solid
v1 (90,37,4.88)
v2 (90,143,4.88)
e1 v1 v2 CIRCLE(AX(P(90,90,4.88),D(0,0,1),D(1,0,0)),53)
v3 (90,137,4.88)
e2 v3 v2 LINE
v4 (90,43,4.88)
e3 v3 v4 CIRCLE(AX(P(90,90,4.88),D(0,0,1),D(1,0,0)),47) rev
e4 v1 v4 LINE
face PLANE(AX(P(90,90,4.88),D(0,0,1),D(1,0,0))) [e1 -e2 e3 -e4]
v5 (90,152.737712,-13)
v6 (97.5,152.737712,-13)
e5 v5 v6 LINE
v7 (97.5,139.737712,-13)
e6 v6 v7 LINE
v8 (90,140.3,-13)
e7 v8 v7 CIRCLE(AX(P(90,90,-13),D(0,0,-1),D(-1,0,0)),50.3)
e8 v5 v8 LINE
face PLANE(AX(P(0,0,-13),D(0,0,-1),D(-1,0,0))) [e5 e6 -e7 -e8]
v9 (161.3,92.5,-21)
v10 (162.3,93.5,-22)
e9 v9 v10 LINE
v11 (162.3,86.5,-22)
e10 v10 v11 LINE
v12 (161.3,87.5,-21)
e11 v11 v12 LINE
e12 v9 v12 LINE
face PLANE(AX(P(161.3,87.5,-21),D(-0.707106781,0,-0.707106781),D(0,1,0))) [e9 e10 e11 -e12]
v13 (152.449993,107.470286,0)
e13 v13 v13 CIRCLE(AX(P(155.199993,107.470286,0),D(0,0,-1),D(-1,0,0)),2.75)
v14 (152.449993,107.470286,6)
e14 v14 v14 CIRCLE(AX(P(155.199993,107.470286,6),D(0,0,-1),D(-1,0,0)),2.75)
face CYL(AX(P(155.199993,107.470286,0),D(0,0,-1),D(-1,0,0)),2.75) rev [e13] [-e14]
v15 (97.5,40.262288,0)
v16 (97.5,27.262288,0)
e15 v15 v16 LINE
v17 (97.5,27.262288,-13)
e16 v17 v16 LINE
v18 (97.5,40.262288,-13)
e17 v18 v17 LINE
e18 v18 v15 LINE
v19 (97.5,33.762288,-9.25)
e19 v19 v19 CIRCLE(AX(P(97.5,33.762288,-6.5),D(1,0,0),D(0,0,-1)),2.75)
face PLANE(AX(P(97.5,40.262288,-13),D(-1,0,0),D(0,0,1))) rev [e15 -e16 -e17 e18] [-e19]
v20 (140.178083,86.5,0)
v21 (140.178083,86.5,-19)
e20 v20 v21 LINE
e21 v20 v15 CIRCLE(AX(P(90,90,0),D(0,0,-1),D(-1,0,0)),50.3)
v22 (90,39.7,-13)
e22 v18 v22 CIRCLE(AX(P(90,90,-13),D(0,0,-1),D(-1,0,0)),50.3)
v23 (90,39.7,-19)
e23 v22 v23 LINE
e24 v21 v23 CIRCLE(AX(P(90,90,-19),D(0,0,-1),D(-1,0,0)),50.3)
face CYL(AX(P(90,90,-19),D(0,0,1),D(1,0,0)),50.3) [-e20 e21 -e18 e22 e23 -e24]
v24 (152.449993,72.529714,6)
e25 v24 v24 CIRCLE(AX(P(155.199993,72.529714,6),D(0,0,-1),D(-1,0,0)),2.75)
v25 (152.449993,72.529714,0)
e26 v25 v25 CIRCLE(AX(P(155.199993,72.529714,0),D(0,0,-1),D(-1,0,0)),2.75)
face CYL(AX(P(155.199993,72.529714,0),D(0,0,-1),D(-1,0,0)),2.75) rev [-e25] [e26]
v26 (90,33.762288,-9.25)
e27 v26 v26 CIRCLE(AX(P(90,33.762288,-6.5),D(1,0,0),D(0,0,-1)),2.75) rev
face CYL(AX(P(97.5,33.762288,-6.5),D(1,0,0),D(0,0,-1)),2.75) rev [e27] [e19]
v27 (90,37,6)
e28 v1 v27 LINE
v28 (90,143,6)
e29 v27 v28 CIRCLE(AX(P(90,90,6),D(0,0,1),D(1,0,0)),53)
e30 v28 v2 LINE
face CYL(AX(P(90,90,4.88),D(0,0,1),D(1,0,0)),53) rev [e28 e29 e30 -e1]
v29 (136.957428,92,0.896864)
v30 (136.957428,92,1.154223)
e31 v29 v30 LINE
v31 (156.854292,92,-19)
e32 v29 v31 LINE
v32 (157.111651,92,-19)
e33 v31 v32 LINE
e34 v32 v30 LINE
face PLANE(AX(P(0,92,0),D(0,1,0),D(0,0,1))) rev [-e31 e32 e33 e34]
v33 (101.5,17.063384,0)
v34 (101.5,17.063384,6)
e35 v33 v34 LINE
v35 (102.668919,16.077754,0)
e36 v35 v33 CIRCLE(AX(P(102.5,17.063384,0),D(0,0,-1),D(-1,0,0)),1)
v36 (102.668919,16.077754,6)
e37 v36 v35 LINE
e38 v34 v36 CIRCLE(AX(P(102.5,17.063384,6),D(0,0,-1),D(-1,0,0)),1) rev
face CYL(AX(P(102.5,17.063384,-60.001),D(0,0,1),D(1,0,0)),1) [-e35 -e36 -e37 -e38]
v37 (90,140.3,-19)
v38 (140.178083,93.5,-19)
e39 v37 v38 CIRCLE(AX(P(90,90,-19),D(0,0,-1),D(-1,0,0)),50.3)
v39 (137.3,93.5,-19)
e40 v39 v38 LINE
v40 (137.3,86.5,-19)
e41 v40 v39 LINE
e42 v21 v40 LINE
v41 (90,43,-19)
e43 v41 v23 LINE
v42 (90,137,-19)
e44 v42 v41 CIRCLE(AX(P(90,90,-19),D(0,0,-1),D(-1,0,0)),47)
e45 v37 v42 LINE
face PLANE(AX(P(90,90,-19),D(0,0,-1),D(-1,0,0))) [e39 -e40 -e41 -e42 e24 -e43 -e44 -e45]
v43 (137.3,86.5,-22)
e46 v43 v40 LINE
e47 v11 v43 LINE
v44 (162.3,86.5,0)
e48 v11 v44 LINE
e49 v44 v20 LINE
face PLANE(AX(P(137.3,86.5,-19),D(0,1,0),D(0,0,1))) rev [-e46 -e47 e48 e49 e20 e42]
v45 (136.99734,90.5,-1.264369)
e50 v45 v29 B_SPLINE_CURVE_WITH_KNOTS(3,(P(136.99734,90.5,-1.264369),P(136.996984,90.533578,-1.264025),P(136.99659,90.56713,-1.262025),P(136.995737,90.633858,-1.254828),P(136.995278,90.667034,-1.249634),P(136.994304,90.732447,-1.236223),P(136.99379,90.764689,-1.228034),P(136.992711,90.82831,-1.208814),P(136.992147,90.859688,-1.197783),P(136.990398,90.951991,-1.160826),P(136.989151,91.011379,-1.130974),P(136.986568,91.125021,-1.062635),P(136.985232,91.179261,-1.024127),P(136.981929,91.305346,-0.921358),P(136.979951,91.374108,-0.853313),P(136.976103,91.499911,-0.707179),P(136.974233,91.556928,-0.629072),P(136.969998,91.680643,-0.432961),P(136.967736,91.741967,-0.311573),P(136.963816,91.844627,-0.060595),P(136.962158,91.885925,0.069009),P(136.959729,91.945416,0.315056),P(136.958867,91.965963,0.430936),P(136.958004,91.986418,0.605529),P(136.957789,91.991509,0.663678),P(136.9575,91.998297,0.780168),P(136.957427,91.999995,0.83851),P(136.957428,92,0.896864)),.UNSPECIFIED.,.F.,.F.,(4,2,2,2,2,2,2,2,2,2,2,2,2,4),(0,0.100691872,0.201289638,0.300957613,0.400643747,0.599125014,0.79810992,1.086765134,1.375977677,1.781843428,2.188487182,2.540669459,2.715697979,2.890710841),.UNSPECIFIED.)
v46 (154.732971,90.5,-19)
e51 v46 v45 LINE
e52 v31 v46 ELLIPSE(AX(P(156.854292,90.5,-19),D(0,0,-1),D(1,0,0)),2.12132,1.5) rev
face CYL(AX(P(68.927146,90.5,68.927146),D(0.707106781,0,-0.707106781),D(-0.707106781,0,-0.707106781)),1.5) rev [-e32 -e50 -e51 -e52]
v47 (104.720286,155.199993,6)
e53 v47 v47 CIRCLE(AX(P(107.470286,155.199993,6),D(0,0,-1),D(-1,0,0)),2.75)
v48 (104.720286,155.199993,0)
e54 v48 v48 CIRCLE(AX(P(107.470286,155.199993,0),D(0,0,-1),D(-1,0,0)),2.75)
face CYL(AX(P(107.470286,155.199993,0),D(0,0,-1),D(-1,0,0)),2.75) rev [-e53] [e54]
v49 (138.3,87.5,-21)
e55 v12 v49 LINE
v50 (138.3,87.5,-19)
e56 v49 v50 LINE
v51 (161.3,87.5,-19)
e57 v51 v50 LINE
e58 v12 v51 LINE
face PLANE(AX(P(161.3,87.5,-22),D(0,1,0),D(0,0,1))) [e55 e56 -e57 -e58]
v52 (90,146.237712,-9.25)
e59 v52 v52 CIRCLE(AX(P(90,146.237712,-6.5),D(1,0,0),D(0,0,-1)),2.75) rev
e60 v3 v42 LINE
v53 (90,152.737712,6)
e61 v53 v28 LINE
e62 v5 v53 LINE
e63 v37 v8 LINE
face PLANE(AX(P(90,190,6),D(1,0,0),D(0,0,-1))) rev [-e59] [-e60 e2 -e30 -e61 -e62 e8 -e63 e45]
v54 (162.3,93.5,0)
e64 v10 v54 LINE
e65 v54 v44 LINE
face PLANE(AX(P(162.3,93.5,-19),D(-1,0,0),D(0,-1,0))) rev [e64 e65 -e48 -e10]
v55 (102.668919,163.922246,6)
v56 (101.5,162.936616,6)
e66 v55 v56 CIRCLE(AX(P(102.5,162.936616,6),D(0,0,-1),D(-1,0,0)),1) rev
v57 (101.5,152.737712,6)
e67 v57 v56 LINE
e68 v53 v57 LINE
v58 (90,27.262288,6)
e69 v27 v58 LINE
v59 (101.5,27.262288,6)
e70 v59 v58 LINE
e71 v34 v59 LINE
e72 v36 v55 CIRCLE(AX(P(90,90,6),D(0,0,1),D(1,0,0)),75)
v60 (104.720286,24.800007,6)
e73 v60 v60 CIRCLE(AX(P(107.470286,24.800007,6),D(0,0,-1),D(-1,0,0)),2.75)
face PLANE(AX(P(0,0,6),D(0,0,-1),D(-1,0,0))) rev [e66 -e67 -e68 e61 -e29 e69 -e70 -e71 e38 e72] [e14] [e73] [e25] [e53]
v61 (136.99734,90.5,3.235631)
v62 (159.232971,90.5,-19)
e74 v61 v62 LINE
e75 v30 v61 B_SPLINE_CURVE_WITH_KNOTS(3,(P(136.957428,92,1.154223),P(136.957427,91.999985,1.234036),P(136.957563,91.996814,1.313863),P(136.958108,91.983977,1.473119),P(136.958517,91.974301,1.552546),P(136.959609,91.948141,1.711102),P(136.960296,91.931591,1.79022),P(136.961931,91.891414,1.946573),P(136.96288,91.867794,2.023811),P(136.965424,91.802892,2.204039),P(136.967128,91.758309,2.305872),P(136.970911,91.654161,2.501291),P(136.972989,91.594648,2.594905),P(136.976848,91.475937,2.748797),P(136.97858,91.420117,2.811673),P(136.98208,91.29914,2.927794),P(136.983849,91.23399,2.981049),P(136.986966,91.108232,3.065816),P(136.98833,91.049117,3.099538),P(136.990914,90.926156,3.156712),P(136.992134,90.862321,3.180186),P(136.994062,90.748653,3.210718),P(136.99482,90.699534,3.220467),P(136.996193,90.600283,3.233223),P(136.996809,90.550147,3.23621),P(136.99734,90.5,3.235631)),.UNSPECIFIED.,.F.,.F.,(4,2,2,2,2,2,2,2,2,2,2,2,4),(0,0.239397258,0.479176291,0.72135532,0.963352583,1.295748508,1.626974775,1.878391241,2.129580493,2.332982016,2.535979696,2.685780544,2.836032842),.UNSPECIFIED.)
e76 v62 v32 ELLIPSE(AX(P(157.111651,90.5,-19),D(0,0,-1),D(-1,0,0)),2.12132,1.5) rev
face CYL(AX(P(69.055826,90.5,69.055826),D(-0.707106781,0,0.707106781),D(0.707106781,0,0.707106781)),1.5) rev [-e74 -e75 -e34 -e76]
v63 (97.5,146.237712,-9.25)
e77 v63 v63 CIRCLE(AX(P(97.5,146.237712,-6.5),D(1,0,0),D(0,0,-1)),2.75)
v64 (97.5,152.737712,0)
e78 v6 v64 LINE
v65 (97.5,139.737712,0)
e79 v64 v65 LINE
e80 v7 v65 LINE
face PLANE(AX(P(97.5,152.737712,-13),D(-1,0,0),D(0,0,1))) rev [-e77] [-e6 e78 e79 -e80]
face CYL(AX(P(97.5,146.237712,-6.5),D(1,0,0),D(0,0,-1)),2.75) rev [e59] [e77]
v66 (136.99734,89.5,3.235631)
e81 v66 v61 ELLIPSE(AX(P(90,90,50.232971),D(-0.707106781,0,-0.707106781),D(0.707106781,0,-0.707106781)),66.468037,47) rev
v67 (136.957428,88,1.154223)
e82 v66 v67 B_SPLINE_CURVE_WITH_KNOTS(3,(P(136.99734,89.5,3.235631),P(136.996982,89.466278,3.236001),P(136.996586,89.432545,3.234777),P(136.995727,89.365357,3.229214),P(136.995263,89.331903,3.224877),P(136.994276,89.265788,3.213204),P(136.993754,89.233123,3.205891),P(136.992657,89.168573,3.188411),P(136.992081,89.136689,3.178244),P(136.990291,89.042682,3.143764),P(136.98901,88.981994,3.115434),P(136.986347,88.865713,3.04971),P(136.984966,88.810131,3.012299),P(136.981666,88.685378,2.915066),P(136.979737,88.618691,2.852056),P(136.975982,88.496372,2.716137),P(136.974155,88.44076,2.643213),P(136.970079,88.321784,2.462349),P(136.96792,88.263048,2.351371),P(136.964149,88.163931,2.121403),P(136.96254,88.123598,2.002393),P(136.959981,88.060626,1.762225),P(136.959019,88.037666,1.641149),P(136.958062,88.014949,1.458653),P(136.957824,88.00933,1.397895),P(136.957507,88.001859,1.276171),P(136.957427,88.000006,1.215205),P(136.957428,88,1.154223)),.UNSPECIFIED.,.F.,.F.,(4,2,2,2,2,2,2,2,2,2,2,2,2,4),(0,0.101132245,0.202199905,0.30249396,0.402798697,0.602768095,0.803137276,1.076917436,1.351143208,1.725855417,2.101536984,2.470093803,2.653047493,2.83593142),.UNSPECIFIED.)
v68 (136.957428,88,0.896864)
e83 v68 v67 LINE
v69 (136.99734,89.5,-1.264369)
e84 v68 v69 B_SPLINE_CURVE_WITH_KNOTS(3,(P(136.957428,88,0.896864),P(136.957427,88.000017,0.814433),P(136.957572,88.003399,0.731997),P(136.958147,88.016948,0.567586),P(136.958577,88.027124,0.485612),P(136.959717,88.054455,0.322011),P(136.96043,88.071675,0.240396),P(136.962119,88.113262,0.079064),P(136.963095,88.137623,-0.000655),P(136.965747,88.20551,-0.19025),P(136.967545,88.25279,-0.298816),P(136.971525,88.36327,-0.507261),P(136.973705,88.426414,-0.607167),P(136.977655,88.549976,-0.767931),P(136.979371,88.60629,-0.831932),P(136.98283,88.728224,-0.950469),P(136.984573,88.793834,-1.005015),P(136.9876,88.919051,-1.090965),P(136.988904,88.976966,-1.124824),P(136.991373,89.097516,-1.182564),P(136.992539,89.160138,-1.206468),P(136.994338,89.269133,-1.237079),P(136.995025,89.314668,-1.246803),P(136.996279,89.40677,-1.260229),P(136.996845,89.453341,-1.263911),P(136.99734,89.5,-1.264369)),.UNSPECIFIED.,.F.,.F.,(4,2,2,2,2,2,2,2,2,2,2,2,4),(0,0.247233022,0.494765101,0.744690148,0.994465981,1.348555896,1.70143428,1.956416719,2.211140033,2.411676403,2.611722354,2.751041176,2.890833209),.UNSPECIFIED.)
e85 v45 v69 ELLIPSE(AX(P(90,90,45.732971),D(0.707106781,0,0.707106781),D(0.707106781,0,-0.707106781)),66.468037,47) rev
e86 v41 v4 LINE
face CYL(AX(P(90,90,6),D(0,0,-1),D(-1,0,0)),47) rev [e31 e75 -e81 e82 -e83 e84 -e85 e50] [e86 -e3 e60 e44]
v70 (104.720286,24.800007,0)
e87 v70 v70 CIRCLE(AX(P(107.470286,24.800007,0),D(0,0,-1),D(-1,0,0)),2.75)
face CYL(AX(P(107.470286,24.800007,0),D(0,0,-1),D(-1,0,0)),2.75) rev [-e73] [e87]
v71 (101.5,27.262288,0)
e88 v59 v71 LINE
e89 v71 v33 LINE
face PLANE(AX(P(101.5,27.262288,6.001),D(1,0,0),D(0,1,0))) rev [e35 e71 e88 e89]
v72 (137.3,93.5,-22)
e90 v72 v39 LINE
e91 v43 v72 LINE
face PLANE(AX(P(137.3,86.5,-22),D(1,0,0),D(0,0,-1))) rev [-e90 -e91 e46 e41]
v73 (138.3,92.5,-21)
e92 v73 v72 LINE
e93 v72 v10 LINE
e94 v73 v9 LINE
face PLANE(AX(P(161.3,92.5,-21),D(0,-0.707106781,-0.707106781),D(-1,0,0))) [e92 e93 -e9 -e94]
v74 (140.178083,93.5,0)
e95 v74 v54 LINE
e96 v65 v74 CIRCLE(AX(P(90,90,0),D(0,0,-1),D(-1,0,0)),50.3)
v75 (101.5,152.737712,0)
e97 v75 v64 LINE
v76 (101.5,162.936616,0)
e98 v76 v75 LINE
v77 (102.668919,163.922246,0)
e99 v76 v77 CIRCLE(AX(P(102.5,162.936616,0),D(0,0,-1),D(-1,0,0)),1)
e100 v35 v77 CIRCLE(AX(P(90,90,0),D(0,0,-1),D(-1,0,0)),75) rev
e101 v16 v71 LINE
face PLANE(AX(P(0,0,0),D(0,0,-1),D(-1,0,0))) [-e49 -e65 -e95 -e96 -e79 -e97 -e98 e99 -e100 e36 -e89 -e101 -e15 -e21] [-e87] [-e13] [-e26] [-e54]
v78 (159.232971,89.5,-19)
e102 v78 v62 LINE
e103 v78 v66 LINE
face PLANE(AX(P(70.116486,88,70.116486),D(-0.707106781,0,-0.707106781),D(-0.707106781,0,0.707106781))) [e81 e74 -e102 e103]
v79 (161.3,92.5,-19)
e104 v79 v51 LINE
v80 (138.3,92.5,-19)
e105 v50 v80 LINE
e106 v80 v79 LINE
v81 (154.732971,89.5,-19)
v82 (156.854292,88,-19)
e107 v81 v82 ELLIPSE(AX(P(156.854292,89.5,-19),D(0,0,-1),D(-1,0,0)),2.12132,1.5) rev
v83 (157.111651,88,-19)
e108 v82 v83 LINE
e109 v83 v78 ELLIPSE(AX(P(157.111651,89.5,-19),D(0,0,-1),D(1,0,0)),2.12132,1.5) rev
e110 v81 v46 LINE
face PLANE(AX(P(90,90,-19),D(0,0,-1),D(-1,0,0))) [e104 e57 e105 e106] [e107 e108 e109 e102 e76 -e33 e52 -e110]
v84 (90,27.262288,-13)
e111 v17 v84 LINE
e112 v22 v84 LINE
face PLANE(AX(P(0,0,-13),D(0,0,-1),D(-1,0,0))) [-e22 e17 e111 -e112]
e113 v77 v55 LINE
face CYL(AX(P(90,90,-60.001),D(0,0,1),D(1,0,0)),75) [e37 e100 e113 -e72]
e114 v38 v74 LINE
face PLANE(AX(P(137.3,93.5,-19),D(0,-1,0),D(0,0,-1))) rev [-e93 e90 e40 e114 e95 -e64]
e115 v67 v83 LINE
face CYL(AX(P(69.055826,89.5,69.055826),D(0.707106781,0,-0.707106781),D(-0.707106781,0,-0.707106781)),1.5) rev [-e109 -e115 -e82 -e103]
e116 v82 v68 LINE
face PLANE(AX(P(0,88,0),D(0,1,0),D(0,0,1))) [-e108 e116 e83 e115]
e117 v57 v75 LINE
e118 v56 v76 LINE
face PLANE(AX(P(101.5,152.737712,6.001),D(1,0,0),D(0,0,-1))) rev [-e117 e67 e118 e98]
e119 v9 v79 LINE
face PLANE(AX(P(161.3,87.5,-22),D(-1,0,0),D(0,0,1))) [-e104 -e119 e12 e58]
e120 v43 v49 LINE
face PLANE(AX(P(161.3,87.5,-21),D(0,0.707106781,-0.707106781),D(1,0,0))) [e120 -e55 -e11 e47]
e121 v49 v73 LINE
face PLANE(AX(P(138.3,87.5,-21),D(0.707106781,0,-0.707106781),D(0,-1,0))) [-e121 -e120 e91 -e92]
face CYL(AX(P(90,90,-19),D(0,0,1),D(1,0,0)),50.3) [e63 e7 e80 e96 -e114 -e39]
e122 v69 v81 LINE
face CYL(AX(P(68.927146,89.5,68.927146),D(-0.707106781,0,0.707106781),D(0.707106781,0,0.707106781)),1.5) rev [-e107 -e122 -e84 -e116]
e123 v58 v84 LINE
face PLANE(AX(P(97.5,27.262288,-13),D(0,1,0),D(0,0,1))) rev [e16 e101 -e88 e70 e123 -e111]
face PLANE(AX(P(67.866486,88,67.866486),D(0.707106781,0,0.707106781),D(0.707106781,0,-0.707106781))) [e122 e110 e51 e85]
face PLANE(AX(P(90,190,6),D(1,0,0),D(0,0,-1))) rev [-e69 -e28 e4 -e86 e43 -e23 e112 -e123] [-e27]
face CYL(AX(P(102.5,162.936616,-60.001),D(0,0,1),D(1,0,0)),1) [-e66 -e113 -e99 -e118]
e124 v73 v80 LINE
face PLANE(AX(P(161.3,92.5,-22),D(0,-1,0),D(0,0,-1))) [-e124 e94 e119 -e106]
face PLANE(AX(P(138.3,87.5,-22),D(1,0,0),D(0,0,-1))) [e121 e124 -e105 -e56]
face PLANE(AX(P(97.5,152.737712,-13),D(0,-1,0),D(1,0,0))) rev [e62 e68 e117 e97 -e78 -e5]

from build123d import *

# Parameters (mm, degrees)
SKETCH1_W                = 180
SKETCH1_H                = 180
BOSS_EXTRUDE1_DEPTH      = 6
SKETCH2_R                = 50.3
SKETCH2_R_2              = 46.3
BOSS_EXTRUDE2_DEPTH      = 19
CUT_EXTRUDE1_DEPTH       = 256.266527379
CUT_EXTRUDE1_DEPTH_BACK  = 256.266527379
SKETCH3_R                = 47
BOSS_EXTRUDE3_DEPTH      = 60
FILLET4_R                = 3
M5_CLEARANCE_HOLE1_D     = 5.5
SKETCH15_W               = 25
SKETCH15_H               = 7
BOSS_EXTRUDE5_DEPTH      = 19
CUT_EXTRUDE3_DEPTH       = 2
FILLET5_R                = 1.5
CUT_EXTRUDE4_REACH       = 264.975
CUT_EXTRUDE5_REACH       = 244.499
SKETCH33_W               = 1
SKETCH33_H               = 25
SKETCH35_W               = 15
SKETCH35_H               = 13
BOSS_EXTRUDE6_DEPTH      = 13
M5_CLEARANCE_HOLE2_D     = 5.5
CUT_EXTRUDE6_DEPTH       = 4.2
CUT_EXTRUDE7_REACH       = 242.936
SKETCH41_W               = 23
SKETCH41_H               = 15
FILLET8_R                = 1
CUT_EXTRUDE8_REACH       = 197.694
SKETCH47_R               = 53
CUT_EXTRUDE10_DEPTH      = 1.12
CUT_EXTRUDE12_DEPTH      = 238.295626108
CUT_EXTRUDE12_DEPTH_BACK = 238.295626108
SKETCH51_W               = 150
SKETCH51_H               = 200
SKETCH52_W               = 25
SKETCH52_H               = 7
SKETCH52_W_2             = 23
SKETCH52_H_2             = 5
BOSS_EXTRUDE9_DEPTH      = 3
CHAMFER1_SIZE            = 1


with BuildPart() as part:
    # Sketch1 → Boss-Extrude1 (new body)
    with BuildSketch(Plane.XY):
        with Locations((90, 90)):
            Rectangle(SKETCH1_W, SKETCH1_H)
    extrude(amount=BOSS_EXTRUDE1_DEPTH)

    # Sketch2 → Boss-Extrude2 (add)
    with BuildSketch(Plane(origin=(0, 0, 0), x_dir=(-1, 0, 0), z_dir=(0, 0, -1))):
        with Locations((-90, 90)):
            Circle(SKETCH2_R)
        with Locations((-90, 90)):
            Circle(SKETCH2_R_2, mode=Mode.SUBTRACT)
    extrude(amount=BOSS_EXTRUDE2_DEPTH)

    # Sketch3 → Cut-Extrude1 (cut, two sides: drawn at the far end of the back side and taken through both)
    with BuildSketch(Plane(origin=(0, 0, 0), x_dir=(-1, 0, 0), z_dir=(0, 0, -1)).offset(-CUT_EXTRUDE1_DEPTH_BACK)):
        with Locations((-90, 90)):
            Circle(SKETCH3_R)
    extrude(amount=CUT_EXTRUDE1_DEPTH + CUT_EXTRUDE1_DEPTH_BACK, mode=Mode.SUBTRACT)

    # Sketch4 → Boss-Extrude3 (add)
    with BuildSketch(Plane(origin=(0, 0, 0), x_dir=(-1, 0, 0), z_dir=(0, 0, -1))):
        with BuildLine():
            Line((0, 77.5), (0, 102.5))
            Line((0, 102.5), (-41.277931078, 102.5))
            ThreePointArc((-41.277931078, 102.5), (-39.7, 90), (-41.277931078, 77.5))
            Line((-41.277931078, 77.5), (0, 77.5))
        make_face()
    extrude(amount=BOSS_EXTRUDE3_DEPTH)

    # Fillet4
    fillet4_edges = [part.edges().sort_by_distance(p)[0] for p in [
        (41.277931078, 102.5, -9.5),
        (41.277931078, 77.5, -9.5),
    ]]
    fillet(fillet4_edges, radius=FILLET4_R)

    # M5 Clearance Hole1 (through all)
    with Locations(Plane(origin=(0, 0, 0), x_dir=(-1, 0, 0), z_dir=(0, 0, -1))):
        with Locations((-107.470285544, 155.199993275), (-155.199993275, 107.470285544), (-155.199993275, 72.529714456), (-107.470285544, 24.800006725), (-72.529714456, 24.800006725), (-24.800006725, 72.529714456), (-24.800006725, 107.470285544), (-72.529714456, 155.199993275)):
            Hole(M5_CLEARANCE_HOLE1_D / 2)

    # Sketch15 → Boss-Extrude5 (add)
    with BuildSketch(Plane(origin=(0, 0, 0), x_dir=(-1, 0, 0), z_dir=(0, 0, -1))):
        with Locations((-149.8, 90)):
            Rectangle(SKETCH15_W, SKETCH15_H)
    extrude(amount=BOSS_EXTRUDE5_DEPTH)

    # Sketch17 → Cut-Extrude3 (cut, symmetric)
    with BuildSketch(Plane(origin=(0, 90, 0), x_dir=(0, 0, -1), z_dir=(0, 1, 0))):
        Polygon((19, -154.732971354), (-1.044131231, -134.688840123), (-5.544131231, -134.688840123), (19, -159.232971354), align=None)
        Polygon((-5.544131231, -134.688840123), (-1.044131231, -134.688840123), (19, -154.732971354), (19, -159.232971354), align=None)
    extrude(amount=CUT_EXTRUDE3_DEPTH, both=True, mode=Mode.SUBTRACT)

    # Fillet5
    fillet5_edges = [part.edges().sort_by_distance(p)[0] for p in [
        (145.845199441, 92, -10.112228087),
        (145.845199441, 88, -10.112228087),
        (148.095199441, 92, -7.862228087),
        (148.095199441, 88, -7.862228087),
    ]]
    fillet(fillet5_edges, radius=FILLET5_R)

    # Sketch31 → Cut-Extrude4 (cut, up to next)
    with BuildSketch(Plane.XY.offset(6), mode=Mode.PRIVATE) as cut_extrude4_sk1:
        with BuildLine():
            Line((0, 180), (0, 102.5))
            Line((0, 102.5), (16.049002711, 102.5))
            ThreePointArc((16.049002711, 102.5), (165, 90), (16.049002711, 77.5))
            Line((16.049002711, 77.5), (0, 77.5))
            Line((0, 77.5), (0, 0))
            Line((0, 0), (180, 0))
            Line((180, 0), (180, 180))
            Line((180, 180), (0, 180))
        make_face()
    cut_extrude4_tool1 = extrude(cut_extrude4_sk1.sketch, amount=-CUT_EXTRUDE4_REACH, mode=Mode.PRIVATE) & part.part
    add(cut_extrude4_tool1.solids().sort_by_distance((2.545584, 141.25, 6))[0], mode=Mode.SUBTRACT)

    # Sketch33 → Cut-Extrude5 (cut, up to next)
    with BuildSketch(Plane.XY.offset(6), mode=Mode.PRIVATE) as cut_extrude5_sk1:
        with Locations((0.5, 90)):
            Rectangle(SKETCH33_W, SKETCH33_H)
    cut_extrude5_tool1 = extrude(cut_extrude5_sk1.sketch, amount=-CUT_EXTRUDE5_REACH, mode=Mode.PRIVATE) & part.part
    add(cut_extrude5_tool1.solids().sort_by_distance((0.5, 90, 6))[0], mode=Mode.SUBTRACT)

    # Sketch35 → Boss-Extrude6 (add)
    with BuildSketch(Plane(origin=(0, 0, 0), x_dir=(-1, 0, 0), z_dir=(0, 0, -1))):
        with Locations((-90, 146.23771205)):
            Rectangle(SKETCH35_W, SKETCH35_H)
        with Locations((-90, 33.76228795)):
            Rectangle(SKETCH35_W, SKETCH35_H)
    extrude(amount=BOSS_EXTRUDE6_DEPTH)

    # M5 Clearance Hole2 (through all)
    with Locations(Plane(origin=(97.5, 0, 0), x_dir=(0, 0, -1), z_dir=(1, 0, 0))):
        with Locations((6.5, 146.23771205), (6.5, 33.76228795)):
            Hole(M5_CLEARANCE_HOLE2_D / 2)

    # Sketch40 → Cut-Extrude6 (cut)
    with BuildSketch(Plane.ZY.offset(-82.5)):
        Polygon((-10.75, 143.783973406), (-6.5, 141.330234762), (-2.25, 143.783973406), (-2.25, 148.691450694), (-6.5, 151.145189338), (-10.75, 148.691450694), align=None)
        Polygon((-2.25, 31.308549306), (-2.25, 36.216026594), (-6.5, 38.669765238), (-10.75, 36.216026594), (-10.75, 31.308549306), (-6.5, 28.854810662), align=None)
    extrude(amount=-CUT_EXTRUDE6_DEPTH, mode=Mode.SUBTRACT)

    # Sketch41 → Cut-Extrude7 (cut, up to next)
    with BuildSketch(Plane(origin=(0, 0, 0), x_dir=(-1, 0, 0), z_dir=(0, 0, -1)), mode=Mode.PRIVATE) as cut_extrude7_sk1:
        with Locations((-90, 160.23771205)):
            Rectangle(SKETCH41_W, SKETCH41_H)
    cut_extrude7_tool1 = extrude(cut_extrude7_sk1.sketch, amount=-CUT_EXTRUDE7_REACH, mode=Mode.PRIVATE) & part.part
    # Sketch41 → Cut-Extrude7 (cut, up to next)
    with BuildSketch(Plane(origin=(0, 0, 0), x_dir=(-1, 0, 0), z_dir=(0, 0, -1)), mode=Mode.PRIVATE) as cut_extrude7_sk2:
        with Locations((-90, 19.76228795)):
            Rectangle(SKETCH41_W, SKETCH41_H)
    cut_extrude7_tool2 = extrude(cut_extrude7_sk2.sketch, amount=-CUT_EXTRUDE7_REACH, mode=Mode.PRIVATE) & part.part
    add(cut_extrude7_tool1.solids().sort_by_distance((90, 160.237712, 0))[0], mode=Mode.SUBTRACT)
    add(cut_extrude7_tool2.solids().sort_by_distance((90, 19.762288, 0))[0], mode=Mode.SUBTRACT)

    # Fillet8
    fillet8_edges = [part.edges().sort_by_distance(p)[0] for p in [
        (101.5, 164.113089262, 3),
        (78.5, 164.113089262, 3),
        (78.5, 15.886910738, 3),
        (101.5, 15.886910738, 3),
    ]]
    fillet(fillet8_edges, radius=FILLET8_R)

    # Sketch42 → Cut-Extrude8 (cut, up to next)
    with BuildSketch(Plane(origin=(0, 102.5, 0), x_dir=(1, 0, 0), z_dir=(0, 1, 0)), mode=Mode.PRIVATE) as cut_extrude8_sk1:
        Polygon((15, -6), (1, 24), (1, -6), align=None)
    cut_extrude8_tool1 = extrude(cut_extrude8_sk1.sketch, amount=-CUT_EXTRUDE8_REACH, mode=Mode.PRIVATE) & part.part
    add(cut_extrude8_tool1.solids().sort_by_distance((5.666667, 102.5, -4))[0], mode=Mode.SUBTRACT)

    # Sketch47 → Cut-Extrude10 (cut)
    with BuildSketch(Plane.XY.offset(6)):
        with Locations((90, 90)):
            Circle(SKETCH47_R)
    extrude(amount=-CUT_EXTRUDE10_DEPTH, mode=Mode.SUBTRACT)

    # Sketch51 → Cut-Extrude12 (cut, two sides: drawn at the far end of the back side and taken through both)
    with BuildSketch(Plane(origin=(0, 0, -13), x_dir=(-1, 0, 0), z_dir=(0, 0, -1)).offset(-CUT_EXTRUDE12_DEPTH_BACK)):
        with Locations((-15, 90)):
            Rectangle(SKETCH51_W, SKETCH51_H)
    extrude(amount=CUT_EXTRUDE12_DEPTH + CUT_EXTRUDE12_DEPTH_BACK, mode=Mode.SUBTRACT)

    # Sketch52 → Boss-Extrude9 (add)
    with BuildSketch(Plane(origin=(0, 0, -19), x_dir=(-1, 0, 0), z_dir=(0, 0, -1))):
        with Locations((-149.8, 90)):
            Rectangle(SKETCH52_W, SKETCH52_H)
        with Locations((-149.8, 90)):
            Rectangle(SKETCH52_W_2, SKETCH52_H_2, mode=Mode.SUBTRACT)
    extrude(amount=BOSS_EXTRUDE9_DEPTH)

    # Chamfer1
    chamfer1_edges = [part.edges().sort_by_distance(p)[0] for p in [
        (161.3, 90, -22),
        (149.8, 87.5, -22),
        (138.3, 90, -22),
        (149.8, 92.5, -22),
    ]]
    chamfer(chamfer1_edges, length=CHAMFER1_SIZE - 0.0001)  # a hair under: the kernel refuses the full size


solid = part.part
